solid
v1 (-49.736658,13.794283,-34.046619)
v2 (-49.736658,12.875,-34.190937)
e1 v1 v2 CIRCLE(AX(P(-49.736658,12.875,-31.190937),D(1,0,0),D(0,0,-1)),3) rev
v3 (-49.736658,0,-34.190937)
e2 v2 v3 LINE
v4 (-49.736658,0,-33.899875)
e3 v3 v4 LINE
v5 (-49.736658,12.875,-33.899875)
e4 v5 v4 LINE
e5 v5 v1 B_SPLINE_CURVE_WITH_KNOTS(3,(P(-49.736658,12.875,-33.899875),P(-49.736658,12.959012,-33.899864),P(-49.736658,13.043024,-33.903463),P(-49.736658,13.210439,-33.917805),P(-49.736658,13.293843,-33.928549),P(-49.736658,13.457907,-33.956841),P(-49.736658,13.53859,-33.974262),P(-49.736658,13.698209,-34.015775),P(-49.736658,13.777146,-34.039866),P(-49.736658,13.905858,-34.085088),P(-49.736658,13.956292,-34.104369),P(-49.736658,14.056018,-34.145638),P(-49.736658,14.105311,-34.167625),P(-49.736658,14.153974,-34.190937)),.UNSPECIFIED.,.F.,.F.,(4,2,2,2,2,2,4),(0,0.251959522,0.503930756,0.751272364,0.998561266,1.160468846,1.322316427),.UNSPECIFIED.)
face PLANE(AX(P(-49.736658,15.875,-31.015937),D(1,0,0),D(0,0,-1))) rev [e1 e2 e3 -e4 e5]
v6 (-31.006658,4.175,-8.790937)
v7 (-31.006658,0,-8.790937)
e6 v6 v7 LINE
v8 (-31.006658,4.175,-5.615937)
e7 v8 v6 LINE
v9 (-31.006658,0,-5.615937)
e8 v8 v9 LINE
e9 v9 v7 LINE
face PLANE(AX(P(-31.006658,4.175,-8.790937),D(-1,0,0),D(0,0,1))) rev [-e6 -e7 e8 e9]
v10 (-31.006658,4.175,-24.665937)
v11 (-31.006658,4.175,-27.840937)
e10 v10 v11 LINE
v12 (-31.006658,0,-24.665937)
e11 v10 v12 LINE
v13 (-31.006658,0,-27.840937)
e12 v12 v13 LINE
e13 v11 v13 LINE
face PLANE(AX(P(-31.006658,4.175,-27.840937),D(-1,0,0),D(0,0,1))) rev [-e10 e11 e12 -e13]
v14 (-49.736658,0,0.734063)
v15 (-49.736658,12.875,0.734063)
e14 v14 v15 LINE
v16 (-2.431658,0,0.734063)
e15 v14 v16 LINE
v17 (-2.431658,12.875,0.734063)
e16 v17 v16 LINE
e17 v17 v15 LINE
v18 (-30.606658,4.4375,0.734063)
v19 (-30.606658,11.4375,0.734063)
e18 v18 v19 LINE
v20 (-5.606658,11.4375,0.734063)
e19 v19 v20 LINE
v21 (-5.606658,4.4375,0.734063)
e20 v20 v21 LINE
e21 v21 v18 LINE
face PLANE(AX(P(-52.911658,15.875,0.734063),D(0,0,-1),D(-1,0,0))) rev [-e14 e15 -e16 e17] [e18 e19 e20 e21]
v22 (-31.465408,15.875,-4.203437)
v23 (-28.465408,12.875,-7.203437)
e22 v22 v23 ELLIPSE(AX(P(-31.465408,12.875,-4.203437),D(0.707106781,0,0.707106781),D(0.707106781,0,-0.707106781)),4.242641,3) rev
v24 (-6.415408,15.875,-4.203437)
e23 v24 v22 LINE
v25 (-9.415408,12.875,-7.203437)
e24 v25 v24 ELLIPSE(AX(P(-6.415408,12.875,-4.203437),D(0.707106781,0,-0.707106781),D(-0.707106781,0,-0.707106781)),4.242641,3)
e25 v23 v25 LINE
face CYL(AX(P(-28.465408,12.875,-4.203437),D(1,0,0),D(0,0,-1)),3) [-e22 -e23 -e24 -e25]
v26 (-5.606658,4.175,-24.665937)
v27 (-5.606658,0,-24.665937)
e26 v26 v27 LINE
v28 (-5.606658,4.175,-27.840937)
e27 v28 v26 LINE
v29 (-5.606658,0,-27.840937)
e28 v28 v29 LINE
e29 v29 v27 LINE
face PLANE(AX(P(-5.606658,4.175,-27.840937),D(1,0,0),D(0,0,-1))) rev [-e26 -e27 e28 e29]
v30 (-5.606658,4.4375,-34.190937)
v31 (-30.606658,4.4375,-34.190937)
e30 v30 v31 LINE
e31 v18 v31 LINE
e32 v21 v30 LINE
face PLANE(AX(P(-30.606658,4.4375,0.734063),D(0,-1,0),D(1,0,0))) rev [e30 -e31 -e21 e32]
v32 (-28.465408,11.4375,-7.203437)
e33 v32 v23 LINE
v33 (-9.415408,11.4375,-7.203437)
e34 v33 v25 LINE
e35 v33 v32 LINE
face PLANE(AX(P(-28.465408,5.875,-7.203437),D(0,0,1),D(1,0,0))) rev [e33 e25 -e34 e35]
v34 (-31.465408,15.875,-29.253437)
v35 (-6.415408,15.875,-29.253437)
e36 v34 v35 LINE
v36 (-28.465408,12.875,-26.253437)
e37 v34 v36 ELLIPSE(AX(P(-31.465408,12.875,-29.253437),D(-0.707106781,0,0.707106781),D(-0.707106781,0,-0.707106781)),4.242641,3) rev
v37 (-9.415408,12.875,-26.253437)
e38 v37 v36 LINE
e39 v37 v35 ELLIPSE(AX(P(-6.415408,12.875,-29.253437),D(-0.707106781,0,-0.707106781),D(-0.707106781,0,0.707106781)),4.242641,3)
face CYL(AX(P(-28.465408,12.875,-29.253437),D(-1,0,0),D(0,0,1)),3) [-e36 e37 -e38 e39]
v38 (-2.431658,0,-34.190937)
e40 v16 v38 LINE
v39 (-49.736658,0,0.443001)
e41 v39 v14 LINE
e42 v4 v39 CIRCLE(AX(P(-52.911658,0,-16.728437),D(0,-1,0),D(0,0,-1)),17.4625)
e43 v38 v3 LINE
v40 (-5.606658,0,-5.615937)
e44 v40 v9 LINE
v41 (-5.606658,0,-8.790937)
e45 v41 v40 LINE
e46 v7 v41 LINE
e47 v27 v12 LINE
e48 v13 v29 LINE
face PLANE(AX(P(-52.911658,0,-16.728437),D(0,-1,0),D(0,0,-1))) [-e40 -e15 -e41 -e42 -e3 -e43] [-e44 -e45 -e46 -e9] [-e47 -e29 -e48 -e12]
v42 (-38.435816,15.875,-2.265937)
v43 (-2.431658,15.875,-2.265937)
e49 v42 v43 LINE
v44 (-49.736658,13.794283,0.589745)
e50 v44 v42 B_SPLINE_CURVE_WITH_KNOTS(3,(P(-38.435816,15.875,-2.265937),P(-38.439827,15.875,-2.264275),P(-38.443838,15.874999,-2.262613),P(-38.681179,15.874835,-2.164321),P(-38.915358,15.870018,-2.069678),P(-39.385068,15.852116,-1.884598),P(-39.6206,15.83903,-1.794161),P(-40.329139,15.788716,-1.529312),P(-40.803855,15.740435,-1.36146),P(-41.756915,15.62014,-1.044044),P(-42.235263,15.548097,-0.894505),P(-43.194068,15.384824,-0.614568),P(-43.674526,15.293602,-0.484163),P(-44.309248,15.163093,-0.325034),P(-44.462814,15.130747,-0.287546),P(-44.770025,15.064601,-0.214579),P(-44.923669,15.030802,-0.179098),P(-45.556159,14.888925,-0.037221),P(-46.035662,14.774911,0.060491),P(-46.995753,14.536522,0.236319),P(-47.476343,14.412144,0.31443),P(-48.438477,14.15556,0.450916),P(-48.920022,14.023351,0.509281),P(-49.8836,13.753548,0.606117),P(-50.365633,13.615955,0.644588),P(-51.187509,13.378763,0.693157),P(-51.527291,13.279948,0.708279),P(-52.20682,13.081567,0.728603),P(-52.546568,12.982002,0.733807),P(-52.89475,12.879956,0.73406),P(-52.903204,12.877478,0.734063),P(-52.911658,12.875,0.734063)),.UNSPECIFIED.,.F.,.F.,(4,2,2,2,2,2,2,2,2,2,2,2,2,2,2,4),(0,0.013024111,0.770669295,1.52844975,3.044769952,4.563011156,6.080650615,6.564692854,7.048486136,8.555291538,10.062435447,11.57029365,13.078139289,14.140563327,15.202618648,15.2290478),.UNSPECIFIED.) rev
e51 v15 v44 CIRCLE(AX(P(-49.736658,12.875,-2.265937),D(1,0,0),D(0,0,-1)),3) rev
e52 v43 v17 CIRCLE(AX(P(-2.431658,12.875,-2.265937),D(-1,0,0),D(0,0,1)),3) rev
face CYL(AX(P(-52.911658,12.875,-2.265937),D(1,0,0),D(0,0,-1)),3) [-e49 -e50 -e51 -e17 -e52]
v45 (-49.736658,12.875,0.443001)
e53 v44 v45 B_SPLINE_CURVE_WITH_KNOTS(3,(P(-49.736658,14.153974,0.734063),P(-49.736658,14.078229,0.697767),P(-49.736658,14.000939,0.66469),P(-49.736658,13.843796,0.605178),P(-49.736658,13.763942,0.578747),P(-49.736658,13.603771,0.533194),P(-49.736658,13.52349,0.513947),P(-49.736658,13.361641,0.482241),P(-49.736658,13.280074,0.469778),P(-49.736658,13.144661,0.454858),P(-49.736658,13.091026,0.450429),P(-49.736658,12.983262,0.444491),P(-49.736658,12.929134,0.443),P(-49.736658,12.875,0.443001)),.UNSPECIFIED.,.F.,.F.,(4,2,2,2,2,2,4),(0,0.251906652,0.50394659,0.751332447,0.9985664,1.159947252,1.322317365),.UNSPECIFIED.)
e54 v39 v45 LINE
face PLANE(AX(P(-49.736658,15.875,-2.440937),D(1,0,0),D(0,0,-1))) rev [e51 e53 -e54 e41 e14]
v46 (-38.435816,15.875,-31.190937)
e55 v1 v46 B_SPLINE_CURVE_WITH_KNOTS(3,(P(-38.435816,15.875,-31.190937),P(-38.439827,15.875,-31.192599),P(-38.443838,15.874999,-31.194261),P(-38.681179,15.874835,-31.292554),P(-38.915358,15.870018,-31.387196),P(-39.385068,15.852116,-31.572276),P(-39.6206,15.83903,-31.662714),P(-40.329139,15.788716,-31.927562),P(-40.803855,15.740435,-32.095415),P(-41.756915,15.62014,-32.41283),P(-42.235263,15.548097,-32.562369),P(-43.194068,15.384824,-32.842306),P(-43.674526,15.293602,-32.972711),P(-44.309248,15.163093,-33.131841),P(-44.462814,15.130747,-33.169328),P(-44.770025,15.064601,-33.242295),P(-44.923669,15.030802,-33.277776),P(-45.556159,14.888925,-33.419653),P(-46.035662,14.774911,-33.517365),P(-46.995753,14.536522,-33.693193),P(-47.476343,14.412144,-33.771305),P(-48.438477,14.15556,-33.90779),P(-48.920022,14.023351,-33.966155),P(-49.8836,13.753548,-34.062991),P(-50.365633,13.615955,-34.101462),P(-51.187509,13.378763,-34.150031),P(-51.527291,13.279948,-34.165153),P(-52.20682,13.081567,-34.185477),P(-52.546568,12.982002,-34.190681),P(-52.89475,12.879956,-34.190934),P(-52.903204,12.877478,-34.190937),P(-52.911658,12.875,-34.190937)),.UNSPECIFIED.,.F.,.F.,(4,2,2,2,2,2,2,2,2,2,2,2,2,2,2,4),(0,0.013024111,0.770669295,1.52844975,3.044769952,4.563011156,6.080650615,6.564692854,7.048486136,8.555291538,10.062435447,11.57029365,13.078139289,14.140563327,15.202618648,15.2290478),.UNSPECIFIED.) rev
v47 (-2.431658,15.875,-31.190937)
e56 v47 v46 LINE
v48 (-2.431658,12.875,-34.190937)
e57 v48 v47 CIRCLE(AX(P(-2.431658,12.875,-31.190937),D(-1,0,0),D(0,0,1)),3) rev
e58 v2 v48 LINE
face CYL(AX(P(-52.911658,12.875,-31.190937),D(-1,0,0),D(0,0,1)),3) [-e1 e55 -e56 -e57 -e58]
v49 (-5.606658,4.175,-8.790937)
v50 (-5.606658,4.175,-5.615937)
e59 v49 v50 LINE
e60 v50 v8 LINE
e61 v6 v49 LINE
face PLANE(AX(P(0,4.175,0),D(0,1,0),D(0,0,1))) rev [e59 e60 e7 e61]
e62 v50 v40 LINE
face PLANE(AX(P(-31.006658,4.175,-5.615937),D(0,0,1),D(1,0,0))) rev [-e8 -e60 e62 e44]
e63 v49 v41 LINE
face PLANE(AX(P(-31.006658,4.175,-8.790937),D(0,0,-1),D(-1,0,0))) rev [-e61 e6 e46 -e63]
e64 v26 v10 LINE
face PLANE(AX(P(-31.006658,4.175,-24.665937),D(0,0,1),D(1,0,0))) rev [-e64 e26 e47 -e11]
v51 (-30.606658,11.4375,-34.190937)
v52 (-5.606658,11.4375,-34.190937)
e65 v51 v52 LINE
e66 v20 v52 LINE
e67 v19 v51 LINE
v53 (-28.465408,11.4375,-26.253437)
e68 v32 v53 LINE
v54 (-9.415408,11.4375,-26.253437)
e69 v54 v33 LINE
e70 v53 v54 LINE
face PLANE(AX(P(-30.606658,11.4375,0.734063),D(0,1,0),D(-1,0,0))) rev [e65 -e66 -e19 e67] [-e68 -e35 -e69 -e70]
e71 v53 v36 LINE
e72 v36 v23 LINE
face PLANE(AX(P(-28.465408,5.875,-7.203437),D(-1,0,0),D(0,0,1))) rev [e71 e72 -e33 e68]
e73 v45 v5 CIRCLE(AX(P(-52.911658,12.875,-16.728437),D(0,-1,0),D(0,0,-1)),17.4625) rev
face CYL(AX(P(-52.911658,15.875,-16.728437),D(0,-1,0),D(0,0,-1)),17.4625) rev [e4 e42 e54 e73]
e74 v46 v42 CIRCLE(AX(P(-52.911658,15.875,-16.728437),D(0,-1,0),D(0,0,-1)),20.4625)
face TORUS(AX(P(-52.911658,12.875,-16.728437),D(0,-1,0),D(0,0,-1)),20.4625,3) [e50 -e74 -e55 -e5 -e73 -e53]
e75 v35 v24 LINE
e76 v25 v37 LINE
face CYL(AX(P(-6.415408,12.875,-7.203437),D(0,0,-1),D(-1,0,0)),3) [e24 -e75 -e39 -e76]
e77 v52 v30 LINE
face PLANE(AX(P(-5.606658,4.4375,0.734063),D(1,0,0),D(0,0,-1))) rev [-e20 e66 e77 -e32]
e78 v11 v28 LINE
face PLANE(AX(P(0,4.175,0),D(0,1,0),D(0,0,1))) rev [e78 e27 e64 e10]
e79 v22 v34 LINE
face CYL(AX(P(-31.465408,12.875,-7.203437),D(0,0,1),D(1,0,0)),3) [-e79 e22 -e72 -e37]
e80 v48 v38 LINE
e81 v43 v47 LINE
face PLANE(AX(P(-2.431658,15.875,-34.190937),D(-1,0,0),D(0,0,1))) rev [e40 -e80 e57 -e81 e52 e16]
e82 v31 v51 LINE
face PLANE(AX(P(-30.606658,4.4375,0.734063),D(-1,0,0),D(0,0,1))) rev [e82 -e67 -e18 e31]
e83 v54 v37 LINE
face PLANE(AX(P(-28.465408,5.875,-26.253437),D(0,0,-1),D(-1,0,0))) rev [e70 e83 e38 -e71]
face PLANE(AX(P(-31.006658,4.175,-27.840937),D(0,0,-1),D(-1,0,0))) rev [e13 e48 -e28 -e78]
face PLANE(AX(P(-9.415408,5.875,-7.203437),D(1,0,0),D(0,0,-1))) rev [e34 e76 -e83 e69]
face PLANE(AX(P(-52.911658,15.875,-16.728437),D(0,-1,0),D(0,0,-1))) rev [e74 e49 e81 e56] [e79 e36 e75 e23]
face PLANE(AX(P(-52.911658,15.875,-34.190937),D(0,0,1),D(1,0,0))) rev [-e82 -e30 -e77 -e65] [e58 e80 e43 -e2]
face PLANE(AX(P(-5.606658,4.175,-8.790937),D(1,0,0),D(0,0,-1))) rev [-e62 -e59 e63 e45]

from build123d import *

# Parameters (mm, degrees)
BOSS_EXTRUDE1_DEPTH = 15.875
SKETCH5_W           = 3.175
SKETCH5_H           = 15.875
CUT_EXTRUDE1_DEPTH  = 3.175
SKETCH6_W           = 3.175
SKETCH6_H           = 15.875
CUT_EXTRUDE2_DEPTH  = 3.175
SKETCH7_W           = 19.05
SKETCH7_H           = 19.05
CUT_EXTRUDE4_DEPTH  = 10
SKETCH8_W           = 25
SKETCH8_H           = 7
CUT_EXTRUDE5_DEPTH  = 63.813266363
FILLET3_R           = 3
SKETCH2_W           = 25.4
SKETCH2_H           = 3.175
CUT_EXTRUDE6_DEPTH  = 4.175
SKETCH3_W           = 25.4
SKETCH3_H           = 3.175
CUT_EXTRUDE7_DEPTH  = 4.175
FILLET4_R           = 3


with BuildPart() as part:
    # Sketch1 → Boss-Extrude1 (new body)
    with BuildSketch(Plane(origin=(0, 0, 0), x_dir=(1, 0, 0), z_dir=(0, 1, 0))):
        with BuildLine():
            Line((-52.911658323, 34.190937018), (-2.431658323, 34.190937018))
            Line((-2.431658323, 34.190937018), (-2.431658323, -0.734062982))
            Line((-2.431658323, -0.734062982), (-52.911658323, -0.734062982))
            ThreePointArc((-52.911658323, -0.734062982), (-35.449158323, 16.728437018), (-52.911658323, 34.190937018))
        make_face()
    extrude(amount=BOSS_EXTRUDE1_DEPTH)

    # Sketch5 → Cut-Extrude1 (cut)
    with BuildSketch(Plane(origin=(0, 0, -34.190937018), x_dir=(-1, 0, 0), z_dir=(0, 0, -1))):
        with Locations((51.324158323, 7.9375)):
            Rectangle(SKETCH5_W, SKETCH5_H)
    extrude(amount=-CUT_EXTRUDE1_DEPTH, mode=Mode.SUBTRACT)

    # Sketch6 → Cut-Extrude2 (cut)
    with BuildSketch(Plane.XY.offset(0.734062982)):
        with Locations((-51.324158323, 7.9375)):
            Rectangle(SKETCH6_W, SKETCH6_H)
    extrude(amount=-CUT_EXTRUDE2_DEPTH, mode=Mode.SUBTRACT)

    # Sketch7 → Cut-Extrude4 (cut)
    with BuildSketch(Plane(origin=(0, 15.875, 0), x_dir=(1, 0, 0), z_dir=(0, 1, 0))):
        with Locations((-18.940408323, 16.728437018)):
            Rectangle(SKETCH7_W, SKETCH7_H)
    extrude(amount=-CUT_EXTRUDE4_DEPTH, mode=Mode.SUBTRACT)

    # Sketch8 → Cut-Extrude5 (cut, through all)
    with BuildSketch(Plane(origin=(0, 0, -34.190937018), x_dir=(-1, 0, 0), z_dir=(0, 0, -1))):
        with Locations((18.106658323, 7.9375)):
            Rectangle(SKETCH8_W, SKETCH8_H)
    extrude(amount=-CUT_EXTRUDE5_DEPTH, mode=Mode.SUBTRACT)

    # Fillet3
    # the kernel refuses this fillet: 3 mm, written as the material it takes off along each edge
    with BuildSketch(Plane(origin=(-57.236658323, 15.875, -34.190937018), x_dir=(0, 0, 1), z_dir=(1, 0, 0)), Plane(origin=(5.068341677, 15.875, 0.734062982), x_dir=(0, 0, -1), z_dir=(-1, 0, 0))) as fillet3_piece_1:
        with BuildLine():
            CenterArc((FILLET3_R, FILLET3_R), FILLET3_R, 180, 90)
            Line((0, FILLET3_R), (0, 0))
            Line((0, 0), (FILLET3_R, 0))
        make_face()
    extrude(amount=62.305, mode=Mode.SUBTRACT)
    with BuildSketch(Plane(origin=(-52.911658323, 15.875, -16.728437018), x_dir=(-0.24468593558499258, 0, 0.969602389088897), z_dir=(-0.969602389088897, 0, -0.24468593558499258))) as fillet3_piece_2:
        with BuildLine():
            CenterArc((17.4625 + FILLET3_R, -FILLET3_R), FILLET3_R, 90, 90)
            Line((17.4625 + FILLET3_R, 0), (17.4625, 0))
            Line((17.4625, 0), (17.4625, -FILLET3_R))
        make_face()
    revolve(axis=Axis((-52.911658323, 15.875, -16.728437018), (0, 1, 0)), revolution_arc=208.326548528, mode=Mode.SUBTRACT)

    # Sketch2 → Cut-Extrude6 (cut)
    with BuildSketch(Plane(origin=(0, 0, 0), x_dir=(-1, 0, 0), z_dir=(0, -1, 0))):
        with Locations((18.306658323, 26.253437018)):
            Rectangle(SKETCH2_W, SKETCH2_H)
    extrude(amount=-CUT_EXTRUDE6_DEPTH, mode=Mode.SUBTRACT)

    # Sketch3 → Cut-Extrude7 (cut)
    with BuildSketch(Plane(origin=(0, 0, 0), x_dir=(-1, 0, 0), z_dir=(0, -1, 0))):
        with Locations((18.306658323, 7.203437018)):
            Rectangle(SKETCH3_W, SKETCH3_H)
    extrude(amount=-CUT_EXTRUDE7_DEPTH, mode=Mode.SUBTRACT)

    # Fillet4
    fillet4_edges = [part.edges().sort_by_distance(p)[0] for p in [
        (-9.415408323, 15.875, -16.728437018),
        (-18.940408323, 15.875, -26.253437018),
        (-28.465408323, 15.875, -16.728437018),
        (-18.940408323, 15.875, -7.203437018),
    ]]
    fillet(fillet4_edges, radius=FILLET4_R)


solid = part.part
